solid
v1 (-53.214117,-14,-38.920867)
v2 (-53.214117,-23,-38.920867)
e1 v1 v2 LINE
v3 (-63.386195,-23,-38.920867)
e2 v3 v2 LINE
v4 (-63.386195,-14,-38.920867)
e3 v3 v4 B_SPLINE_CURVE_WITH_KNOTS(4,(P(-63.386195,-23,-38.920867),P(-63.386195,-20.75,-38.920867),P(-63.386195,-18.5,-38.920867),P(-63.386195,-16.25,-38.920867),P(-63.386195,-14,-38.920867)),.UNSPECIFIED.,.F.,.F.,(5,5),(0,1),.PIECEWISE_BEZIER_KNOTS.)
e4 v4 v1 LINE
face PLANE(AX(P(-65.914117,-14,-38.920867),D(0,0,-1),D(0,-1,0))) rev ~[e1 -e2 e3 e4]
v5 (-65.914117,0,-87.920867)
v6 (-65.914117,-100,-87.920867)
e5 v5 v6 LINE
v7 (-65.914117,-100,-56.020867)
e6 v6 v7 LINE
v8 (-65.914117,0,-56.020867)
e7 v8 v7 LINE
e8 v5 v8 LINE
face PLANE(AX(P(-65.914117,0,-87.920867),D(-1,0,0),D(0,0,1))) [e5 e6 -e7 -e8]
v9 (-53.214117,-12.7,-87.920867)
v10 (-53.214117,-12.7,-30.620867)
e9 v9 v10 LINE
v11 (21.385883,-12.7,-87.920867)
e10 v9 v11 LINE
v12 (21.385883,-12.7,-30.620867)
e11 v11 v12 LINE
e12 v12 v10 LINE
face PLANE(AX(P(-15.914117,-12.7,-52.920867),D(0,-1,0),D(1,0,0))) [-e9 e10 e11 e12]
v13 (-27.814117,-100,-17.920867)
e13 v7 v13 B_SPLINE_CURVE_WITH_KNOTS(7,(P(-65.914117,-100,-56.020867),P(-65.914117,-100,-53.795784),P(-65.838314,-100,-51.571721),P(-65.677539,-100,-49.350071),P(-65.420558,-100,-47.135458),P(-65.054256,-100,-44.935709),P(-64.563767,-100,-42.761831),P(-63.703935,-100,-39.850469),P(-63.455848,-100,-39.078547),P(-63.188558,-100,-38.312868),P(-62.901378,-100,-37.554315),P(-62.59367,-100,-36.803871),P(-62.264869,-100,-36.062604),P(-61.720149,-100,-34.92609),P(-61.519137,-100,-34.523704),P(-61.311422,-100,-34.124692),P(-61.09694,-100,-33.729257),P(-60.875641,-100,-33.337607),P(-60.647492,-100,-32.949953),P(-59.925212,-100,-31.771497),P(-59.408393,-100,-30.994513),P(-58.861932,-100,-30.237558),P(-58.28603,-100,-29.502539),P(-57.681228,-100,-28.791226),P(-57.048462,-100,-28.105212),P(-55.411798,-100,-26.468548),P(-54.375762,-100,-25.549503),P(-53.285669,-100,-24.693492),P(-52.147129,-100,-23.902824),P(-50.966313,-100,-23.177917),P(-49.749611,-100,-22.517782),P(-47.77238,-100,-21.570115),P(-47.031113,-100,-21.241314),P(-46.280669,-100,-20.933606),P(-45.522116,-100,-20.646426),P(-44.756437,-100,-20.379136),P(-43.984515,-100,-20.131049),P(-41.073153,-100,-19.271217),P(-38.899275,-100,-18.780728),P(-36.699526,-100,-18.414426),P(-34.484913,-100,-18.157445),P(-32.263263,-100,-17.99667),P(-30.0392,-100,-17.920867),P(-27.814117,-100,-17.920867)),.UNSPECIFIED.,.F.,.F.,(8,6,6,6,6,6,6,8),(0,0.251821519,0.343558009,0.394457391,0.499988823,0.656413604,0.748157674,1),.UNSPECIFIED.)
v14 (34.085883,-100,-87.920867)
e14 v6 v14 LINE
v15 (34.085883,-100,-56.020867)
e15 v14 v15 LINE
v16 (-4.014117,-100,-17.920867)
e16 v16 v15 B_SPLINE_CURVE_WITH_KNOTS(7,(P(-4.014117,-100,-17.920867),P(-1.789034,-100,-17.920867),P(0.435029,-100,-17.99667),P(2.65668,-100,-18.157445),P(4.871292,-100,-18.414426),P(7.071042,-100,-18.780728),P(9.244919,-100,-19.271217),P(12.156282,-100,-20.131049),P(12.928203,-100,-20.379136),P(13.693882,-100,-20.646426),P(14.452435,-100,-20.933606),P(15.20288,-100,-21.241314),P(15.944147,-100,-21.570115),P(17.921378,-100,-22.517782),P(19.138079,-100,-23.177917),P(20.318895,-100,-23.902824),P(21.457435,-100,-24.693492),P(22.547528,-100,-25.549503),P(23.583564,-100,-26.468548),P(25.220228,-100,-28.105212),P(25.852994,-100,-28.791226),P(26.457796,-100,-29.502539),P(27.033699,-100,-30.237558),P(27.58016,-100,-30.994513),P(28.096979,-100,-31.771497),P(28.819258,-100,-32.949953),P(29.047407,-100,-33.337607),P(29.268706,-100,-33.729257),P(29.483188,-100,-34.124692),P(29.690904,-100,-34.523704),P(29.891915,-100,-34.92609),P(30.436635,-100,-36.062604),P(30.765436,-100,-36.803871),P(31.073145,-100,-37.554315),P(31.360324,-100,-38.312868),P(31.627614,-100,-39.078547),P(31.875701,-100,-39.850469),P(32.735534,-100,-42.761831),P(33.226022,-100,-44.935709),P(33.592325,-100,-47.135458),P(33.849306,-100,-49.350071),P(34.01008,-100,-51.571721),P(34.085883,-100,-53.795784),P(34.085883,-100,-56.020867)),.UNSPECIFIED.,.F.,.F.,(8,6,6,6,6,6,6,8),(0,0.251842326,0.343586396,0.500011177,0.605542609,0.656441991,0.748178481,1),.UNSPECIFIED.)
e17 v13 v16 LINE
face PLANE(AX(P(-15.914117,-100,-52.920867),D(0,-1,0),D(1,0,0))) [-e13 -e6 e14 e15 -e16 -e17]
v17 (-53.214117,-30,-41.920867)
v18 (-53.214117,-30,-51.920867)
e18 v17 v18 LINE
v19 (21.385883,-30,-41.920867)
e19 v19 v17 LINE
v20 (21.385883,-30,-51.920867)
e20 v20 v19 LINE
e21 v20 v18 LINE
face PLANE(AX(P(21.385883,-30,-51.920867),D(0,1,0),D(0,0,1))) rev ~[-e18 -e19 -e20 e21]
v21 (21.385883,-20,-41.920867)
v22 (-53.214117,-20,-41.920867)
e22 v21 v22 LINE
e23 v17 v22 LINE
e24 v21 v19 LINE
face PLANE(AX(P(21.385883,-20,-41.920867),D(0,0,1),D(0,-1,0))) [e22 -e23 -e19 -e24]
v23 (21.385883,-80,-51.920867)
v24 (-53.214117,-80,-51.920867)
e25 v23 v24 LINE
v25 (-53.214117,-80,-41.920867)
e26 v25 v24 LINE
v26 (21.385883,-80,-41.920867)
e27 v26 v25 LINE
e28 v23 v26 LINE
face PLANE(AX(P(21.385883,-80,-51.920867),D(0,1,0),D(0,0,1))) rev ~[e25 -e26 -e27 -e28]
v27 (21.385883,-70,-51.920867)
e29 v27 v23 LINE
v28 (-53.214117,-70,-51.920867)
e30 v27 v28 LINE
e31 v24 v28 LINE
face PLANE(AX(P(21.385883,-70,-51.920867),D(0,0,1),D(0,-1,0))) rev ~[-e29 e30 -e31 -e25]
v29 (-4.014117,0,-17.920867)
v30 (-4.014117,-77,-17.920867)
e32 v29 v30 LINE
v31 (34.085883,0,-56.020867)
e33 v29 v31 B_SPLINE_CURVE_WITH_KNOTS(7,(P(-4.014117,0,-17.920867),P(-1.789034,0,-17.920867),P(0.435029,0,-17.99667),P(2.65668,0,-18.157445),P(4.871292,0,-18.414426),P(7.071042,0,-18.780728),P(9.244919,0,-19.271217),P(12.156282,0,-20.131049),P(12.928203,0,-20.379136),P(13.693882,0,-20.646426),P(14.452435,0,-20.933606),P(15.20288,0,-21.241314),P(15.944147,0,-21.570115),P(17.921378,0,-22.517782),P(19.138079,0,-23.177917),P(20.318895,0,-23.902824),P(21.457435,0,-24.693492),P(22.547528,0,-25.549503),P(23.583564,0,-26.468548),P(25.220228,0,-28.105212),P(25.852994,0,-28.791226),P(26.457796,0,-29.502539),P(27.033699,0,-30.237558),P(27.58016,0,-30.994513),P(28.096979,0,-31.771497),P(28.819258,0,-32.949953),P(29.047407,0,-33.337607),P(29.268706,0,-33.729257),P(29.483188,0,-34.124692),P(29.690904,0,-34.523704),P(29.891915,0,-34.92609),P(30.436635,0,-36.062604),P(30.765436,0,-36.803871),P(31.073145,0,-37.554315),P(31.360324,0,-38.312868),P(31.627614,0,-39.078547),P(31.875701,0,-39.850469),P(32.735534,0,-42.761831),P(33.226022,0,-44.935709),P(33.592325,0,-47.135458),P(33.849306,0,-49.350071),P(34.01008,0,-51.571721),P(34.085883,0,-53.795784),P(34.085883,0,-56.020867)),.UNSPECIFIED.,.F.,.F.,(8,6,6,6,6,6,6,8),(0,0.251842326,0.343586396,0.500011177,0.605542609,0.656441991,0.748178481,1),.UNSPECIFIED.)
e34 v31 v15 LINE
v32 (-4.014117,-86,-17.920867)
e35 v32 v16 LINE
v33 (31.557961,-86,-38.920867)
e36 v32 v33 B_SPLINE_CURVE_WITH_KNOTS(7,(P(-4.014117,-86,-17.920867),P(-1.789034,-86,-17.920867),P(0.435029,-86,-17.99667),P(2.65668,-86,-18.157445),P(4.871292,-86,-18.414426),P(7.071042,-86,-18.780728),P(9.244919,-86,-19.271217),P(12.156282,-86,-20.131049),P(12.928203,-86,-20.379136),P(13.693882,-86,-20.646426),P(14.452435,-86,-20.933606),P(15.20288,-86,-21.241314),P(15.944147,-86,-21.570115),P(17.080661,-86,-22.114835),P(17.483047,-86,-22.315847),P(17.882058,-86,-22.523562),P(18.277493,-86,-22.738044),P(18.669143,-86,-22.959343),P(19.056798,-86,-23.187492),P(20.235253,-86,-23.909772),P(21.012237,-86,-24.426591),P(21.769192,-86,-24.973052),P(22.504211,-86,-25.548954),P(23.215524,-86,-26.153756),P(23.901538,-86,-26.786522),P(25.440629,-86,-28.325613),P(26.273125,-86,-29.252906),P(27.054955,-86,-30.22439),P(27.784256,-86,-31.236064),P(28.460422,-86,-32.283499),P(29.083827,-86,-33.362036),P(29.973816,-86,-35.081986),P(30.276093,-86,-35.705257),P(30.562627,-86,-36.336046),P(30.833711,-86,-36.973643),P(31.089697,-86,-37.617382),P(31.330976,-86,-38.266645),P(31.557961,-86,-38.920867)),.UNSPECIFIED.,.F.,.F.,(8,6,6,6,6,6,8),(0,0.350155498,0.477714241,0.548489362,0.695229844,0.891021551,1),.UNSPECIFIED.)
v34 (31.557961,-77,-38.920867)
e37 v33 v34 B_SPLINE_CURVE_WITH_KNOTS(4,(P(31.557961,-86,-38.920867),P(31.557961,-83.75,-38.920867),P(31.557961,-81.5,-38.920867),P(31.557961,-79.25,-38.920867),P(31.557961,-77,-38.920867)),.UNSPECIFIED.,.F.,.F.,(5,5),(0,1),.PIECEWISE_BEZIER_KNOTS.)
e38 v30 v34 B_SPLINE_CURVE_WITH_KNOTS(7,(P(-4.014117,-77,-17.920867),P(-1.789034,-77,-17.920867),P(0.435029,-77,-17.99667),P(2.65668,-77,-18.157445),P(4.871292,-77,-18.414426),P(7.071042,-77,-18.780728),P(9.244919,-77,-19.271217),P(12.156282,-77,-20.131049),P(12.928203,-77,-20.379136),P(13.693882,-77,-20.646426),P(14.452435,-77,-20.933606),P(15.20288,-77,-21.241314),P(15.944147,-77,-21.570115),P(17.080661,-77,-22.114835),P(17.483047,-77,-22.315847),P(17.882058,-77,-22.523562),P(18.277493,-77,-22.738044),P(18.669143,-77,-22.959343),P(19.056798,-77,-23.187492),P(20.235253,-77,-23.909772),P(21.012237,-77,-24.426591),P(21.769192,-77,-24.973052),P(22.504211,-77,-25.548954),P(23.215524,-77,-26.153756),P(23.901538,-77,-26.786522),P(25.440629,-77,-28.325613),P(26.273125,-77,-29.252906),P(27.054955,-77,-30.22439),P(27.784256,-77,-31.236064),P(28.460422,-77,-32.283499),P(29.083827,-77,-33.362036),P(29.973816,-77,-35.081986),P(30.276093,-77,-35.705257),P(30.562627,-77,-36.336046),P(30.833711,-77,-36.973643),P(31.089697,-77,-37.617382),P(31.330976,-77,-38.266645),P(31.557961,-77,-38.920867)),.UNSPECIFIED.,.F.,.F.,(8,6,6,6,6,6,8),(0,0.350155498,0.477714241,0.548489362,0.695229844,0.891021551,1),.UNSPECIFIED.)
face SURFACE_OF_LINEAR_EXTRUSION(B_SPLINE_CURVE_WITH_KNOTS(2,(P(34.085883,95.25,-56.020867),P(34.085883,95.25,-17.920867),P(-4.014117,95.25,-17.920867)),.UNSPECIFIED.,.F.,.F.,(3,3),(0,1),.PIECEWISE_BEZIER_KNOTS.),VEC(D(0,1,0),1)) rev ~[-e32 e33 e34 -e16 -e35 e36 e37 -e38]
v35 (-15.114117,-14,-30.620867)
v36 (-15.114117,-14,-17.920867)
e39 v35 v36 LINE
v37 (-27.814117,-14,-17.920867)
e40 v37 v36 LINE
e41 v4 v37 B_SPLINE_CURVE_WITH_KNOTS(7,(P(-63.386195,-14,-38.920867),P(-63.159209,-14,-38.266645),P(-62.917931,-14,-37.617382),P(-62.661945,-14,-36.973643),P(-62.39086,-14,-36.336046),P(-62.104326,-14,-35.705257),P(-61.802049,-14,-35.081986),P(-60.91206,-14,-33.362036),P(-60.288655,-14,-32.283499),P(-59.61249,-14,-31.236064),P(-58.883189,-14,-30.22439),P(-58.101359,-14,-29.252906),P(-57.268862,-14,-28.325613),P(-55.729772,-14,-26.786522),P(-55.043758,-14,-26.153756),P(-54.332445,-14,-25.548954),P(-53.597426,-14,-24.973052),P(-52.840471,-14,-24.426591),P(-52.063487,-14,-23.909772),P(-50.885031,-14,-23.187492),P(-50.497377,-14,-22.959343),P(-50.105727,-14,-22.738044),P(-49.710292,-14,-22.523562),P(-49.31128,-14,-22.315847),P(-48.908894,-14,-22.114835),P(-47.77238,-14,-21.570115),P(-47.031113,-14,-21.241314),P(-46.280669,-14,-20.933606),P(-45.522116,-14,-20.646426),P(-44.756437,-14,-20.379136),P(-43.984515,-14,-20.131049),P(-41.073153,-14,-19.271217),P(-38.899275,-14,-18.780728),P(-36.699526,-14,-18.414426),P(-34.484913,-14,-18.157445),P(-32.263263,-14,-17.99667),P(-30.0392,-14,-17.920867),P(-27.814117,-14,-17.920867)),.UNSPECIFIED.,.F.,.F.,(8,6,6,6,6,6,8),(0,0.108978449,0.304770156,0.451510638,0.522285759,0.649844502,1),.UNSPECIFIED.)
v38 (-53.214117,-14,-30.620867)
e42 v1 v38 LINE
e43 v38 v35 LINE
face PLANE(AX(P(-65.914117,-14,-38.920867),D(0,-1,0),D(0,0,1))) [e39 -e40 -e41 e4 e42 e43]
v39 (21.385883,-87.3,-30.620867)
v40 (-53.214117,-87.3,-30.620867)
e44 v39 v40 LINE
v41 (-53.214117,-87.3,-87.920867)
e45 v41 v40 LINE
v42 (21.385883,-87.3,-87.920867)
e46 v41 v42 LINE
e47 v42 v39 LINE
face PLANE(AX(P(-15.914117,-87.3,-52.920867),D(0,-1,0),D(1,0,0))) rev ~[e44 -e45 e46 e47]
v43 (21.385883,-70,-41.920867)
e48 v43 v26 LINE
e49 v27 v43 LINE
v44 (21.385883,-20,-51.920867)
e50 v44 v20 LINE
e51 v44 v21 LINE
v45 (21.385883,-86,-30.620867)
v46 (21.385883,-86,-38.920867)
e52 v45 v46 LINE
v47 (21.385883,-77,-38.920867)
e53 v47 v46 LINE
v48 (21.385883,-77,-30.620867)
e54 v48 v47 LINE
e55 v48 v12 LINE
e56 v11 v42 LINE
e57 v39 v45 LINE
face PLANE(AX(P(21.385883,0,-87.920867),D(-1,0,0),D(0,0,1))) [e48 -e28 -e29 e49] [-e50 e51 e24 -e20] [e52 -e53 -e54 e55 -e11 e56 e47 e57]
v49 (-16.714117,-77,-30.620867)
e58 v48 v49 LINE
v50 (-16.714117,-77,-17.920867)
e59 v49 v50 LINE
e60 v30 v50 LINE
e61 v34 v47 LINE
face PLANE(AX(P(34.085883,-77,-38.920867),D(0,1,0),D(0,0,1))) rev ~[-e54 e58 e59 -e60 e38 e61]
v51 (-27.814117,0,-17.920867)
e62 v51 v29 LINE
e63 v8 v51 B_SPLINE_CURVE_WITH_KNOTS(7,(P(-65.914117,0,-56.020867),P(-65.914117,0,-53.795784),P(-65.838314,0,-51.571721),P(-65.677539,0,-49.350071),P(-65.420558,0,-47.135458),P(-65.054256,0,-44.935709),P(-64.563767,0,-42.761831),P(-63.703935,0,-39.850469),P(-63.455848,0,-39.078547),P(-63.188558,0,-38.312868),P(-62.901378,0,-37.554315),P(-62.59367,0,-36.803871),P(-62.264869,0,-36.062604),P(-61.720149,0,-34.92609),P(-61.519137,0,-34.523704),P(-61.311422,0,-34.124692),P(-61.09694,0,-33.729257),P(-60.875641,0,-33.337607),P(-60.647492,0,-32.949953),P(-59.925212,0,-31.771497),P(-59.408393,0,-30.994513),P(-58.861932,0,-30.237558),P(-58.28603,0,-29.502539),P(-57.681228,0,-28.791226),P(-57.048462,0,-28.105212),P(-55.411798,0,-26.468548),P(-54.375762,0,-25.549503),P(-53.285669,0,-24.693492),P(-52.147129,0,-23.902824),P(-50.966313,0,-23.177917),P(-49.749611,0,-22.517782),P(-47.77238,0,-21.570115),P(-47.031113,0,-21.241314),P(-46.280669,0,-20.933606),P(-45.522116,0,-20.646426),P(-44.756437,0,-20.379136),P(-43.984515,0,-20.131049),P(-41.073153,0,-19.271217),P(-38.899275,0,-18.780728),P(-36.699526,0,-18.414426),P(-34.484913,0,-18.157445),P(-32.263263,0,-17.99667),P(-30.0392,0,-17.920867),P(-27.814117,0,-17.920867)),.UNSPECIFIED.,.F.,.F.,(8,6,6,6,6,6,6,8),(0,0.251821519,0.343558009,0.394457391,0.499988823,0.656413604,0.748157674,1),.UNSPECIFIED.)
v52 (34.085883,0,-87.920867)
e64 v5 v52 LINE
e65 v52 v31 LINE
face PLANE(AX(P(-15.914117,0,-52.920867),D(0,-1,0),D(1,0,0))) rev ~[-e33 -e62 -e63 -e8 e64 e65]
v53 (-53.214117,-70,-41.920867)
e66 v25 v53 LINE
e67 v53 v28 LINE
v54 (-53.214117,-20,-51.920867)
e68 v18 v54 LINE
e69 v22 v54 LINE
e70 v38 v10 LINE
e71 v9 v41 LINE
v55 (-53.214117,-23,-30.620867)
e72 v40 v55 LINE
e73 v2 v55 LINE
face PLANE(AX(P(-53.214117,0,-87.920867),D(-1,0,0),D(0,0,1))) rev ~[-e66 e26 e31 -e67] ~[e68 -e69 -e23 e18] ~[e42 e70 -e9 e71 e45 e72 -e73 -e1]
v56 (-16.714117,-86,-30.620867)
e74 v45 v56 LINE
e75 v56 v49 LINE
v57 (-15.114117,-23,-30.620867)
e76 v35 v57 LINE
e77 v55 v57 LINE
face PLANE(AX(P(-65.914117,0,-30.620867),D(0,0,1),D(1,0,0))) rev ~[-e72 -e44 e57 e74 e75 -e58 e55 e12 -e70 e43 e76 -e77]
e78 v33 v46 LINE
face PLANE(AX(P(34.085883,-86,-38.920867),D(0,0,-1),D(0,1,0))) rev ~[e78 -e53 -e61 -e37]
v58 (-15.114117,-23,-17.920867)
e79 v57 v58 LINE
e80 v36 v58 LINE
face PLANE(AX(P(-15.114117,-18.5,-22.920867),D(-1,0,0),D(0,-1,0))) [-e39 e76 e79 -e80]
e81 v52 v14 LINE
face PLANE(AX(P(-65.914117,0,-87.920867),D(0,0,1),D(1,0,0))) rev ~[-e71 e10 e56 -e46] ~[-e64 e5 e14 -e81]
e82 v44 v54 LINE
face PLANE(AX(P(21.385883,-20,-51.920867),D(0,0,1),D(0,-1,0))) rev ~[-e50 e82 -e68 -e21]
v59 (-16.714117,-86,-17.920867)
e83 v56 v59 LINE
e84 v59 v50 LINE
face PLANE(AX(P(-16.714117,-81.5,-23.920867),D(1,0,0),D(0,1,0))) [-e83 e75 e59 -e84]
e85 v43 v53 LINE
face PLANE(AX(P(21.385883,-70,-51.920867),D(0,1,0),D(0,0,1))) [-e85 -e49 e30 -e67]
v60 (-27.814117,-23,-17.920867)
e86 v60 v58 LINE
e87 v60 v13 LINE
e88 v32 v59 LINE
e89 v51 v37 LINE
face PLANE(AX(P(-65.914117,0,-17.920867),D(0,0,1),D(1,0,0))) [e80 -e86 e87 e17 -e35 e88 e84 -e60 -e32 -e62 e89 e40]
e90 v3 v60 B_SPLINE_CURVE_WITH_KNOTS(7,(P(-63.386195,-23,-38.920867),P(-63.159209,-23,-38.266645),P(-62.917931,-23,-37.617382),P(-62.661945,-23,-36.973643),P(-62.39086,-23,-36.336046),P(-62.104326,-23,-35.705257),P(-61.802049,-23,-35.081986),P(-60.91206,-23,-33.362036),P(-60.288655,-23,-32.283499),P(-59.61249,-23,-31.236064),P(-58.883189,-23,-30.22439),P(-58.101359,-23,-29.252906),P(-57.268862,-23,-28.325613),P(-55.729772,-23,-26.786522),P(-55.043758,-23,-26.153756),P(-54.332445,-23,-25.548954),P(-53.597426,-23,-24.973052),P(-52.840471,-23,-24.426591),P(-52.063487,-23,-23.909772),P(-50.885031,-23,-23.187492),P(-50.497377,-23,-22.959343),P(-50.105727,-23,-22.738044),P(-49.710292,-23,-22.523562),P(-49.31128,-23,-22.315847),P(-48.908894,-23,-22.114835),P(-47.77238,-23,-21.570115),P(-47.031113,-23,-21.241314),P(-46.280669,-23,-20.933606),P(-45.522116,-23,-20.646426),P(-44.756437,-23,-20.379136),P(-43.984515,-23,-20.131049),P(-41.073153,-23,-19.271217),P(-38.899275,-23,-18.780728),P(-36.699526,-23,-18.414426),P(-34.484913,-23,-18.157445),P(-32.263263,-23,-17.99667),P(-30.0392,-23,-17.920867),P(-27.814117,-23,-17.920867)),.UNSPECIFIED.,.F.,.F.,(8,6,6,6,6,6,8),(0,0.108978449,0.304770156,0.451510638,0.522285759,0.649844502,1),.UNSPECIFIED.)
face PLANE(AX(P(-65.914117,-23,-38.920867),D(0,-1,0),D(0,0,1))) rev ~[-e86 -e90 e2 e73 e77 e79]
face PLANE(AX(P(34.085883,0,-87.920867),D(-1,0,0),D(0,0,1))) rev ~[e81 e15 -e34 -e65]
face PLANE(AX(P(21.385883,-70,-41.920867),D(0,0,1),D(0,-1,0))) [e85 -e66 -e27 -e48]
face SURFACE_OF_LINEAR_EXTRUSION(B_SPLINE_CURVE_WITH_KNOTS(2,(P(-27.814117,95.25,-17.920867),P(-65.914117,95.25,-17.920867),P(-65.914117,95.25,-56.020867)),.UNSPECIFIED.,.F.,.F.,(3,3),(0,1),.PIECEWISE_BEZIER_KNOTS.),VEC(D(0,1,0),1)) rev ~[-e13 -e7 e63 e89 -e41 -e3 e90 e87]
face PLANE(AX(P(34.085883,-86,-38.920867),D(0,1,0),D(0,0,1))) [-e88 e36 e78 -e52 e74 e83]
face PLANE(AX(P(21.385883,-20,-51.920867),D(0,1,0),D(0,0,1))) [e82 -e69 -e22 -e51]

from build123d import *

# Parameters (mm, degrees)
F0_W        = 100
F0_H        = 70
F1_DEPTH    = 100
F2_T        = -12.7
F3_T1_DEPTH = 290.5
F4_T1_DEPTH = 290.5
F5_W        = 9
F5_H        = 32
F6_DEPTH    = 50.8
F7_W        = 9
F7_H        = 30
F8_DEPTH    = 50.8
F9_W        = 10
F9_H        = 10
F10_DEPTH   = 83.82


# Not quite as in the source:
# - a fillet or chamfer that OpenCascade refuses, or shapes differently, is made with other operations: its cross-section is extruded or revolved along the edge and cut away or added


with BuildPart() as f1:
    # F0 (on Front) → F1 (new body)
    with BuildSketch(Plane.XZ):
        with Locations((-15.9141167998, -52.9208671927)):
            Rectangle(F0_W, F0_H)
    extrude(amount=F1_DEPTH)

    # F2
    f2_openings = [f1.faces().sort_by_distance(p)[0] for p in [
        (-15.914117, -50, -87.920867),
    ]]
    offset(amount=F2_T, openings=f2_openings)

    # F3: fillet of radius 38.1 on 1 edges, made by hand

    # F3_s2 → F3_t1 (cut)
    with BuildSketch(Plane.XZ.offset(-95.25)):
        with BuildLine():
            add(Edge.make_bspline(
                [(34.0858832002, -56.0208671927), (34.0858832002, -17.9208671927), (-4.0141167998, -17.9208671927)],
                knots=[0, 0, 0, 1, 1, 1], degree=2, weights=[1, 1, 1]))
            Line((-4.0141167998, -17.9208671927), (34.0858832002, -17.9208671927))
            Line((34.0858832002, -17.9208671927), (34.0858832002, -56.0208671927))
        make_face()
    extrude(amount=F3_T1_DEPTH, mode=Mode.SUBTRACT)

    # F4: fillet of radius 38.1 on 1 edges, made by hand

    # F4_s2 → F4_t1 (cut)
    with BuildSketch(Plane.XZ.offset(-95.25)):
        with BuildLine():
            add(Edge.make_bspline(
                [(-27.8141167998, -17.9208671927), (-65.9141167998, -17.9208671927), (-65.9141167998, -56.0208671927)],
                knots=[0, 0, 0, 1, 1, 1], degree=2, weights=[1, 1, 1]))
            Line((-65.9141167998, -56.0208671927), (-65.9141167998, -17.9208671927))
            Line((-65.9141167998, -17.9208671927), (-27.8141167998, -17.9208671927))
        make_face()
    extrude(amount=F4_T1_DEPTH, mode=Mode.SUBTRACT)

    # F5 (on face) → F6 (cut)
    with BuildSketch(Plane(origin=(-65.9141167998, 0, 0), x_dir=(0, -1, 0), z_dir=(-1, 0, 0))):
        with Locations((18.5, -22.9208671927)):
            Rectangle(F5_W, F5_H)
    extrude(amount=-F6_DEPTH, mode=Mode.SUBTRACT)

    # F7 (on face) → F8 (cut)
    with BuildSketch(Plane.YZ.offset(34.0858832002)):
        with Locations((-81.5, -23.9208671927)):
            Rectangle(F7_W, F7_H)
    extrude(amount=-F8_DEPTH, mode=Mode.SUBTRACT)

    # F9 (on face) → F10 (join)
    with BuildSketch(Plane(origin=(21.3858832002, 0, 0), x_dir=(0, -1, 0), z_dir=(-1, 0, 0))):
        with Locations((25, -46.9208671927)):
            Rectangle(F9_W, F9_H)
        with Locations((75, -46.9208671927)):
            Rectangle(F9_W, F9_H)
    extrude(amount=F10_DEPTH)


solid = f1.part
